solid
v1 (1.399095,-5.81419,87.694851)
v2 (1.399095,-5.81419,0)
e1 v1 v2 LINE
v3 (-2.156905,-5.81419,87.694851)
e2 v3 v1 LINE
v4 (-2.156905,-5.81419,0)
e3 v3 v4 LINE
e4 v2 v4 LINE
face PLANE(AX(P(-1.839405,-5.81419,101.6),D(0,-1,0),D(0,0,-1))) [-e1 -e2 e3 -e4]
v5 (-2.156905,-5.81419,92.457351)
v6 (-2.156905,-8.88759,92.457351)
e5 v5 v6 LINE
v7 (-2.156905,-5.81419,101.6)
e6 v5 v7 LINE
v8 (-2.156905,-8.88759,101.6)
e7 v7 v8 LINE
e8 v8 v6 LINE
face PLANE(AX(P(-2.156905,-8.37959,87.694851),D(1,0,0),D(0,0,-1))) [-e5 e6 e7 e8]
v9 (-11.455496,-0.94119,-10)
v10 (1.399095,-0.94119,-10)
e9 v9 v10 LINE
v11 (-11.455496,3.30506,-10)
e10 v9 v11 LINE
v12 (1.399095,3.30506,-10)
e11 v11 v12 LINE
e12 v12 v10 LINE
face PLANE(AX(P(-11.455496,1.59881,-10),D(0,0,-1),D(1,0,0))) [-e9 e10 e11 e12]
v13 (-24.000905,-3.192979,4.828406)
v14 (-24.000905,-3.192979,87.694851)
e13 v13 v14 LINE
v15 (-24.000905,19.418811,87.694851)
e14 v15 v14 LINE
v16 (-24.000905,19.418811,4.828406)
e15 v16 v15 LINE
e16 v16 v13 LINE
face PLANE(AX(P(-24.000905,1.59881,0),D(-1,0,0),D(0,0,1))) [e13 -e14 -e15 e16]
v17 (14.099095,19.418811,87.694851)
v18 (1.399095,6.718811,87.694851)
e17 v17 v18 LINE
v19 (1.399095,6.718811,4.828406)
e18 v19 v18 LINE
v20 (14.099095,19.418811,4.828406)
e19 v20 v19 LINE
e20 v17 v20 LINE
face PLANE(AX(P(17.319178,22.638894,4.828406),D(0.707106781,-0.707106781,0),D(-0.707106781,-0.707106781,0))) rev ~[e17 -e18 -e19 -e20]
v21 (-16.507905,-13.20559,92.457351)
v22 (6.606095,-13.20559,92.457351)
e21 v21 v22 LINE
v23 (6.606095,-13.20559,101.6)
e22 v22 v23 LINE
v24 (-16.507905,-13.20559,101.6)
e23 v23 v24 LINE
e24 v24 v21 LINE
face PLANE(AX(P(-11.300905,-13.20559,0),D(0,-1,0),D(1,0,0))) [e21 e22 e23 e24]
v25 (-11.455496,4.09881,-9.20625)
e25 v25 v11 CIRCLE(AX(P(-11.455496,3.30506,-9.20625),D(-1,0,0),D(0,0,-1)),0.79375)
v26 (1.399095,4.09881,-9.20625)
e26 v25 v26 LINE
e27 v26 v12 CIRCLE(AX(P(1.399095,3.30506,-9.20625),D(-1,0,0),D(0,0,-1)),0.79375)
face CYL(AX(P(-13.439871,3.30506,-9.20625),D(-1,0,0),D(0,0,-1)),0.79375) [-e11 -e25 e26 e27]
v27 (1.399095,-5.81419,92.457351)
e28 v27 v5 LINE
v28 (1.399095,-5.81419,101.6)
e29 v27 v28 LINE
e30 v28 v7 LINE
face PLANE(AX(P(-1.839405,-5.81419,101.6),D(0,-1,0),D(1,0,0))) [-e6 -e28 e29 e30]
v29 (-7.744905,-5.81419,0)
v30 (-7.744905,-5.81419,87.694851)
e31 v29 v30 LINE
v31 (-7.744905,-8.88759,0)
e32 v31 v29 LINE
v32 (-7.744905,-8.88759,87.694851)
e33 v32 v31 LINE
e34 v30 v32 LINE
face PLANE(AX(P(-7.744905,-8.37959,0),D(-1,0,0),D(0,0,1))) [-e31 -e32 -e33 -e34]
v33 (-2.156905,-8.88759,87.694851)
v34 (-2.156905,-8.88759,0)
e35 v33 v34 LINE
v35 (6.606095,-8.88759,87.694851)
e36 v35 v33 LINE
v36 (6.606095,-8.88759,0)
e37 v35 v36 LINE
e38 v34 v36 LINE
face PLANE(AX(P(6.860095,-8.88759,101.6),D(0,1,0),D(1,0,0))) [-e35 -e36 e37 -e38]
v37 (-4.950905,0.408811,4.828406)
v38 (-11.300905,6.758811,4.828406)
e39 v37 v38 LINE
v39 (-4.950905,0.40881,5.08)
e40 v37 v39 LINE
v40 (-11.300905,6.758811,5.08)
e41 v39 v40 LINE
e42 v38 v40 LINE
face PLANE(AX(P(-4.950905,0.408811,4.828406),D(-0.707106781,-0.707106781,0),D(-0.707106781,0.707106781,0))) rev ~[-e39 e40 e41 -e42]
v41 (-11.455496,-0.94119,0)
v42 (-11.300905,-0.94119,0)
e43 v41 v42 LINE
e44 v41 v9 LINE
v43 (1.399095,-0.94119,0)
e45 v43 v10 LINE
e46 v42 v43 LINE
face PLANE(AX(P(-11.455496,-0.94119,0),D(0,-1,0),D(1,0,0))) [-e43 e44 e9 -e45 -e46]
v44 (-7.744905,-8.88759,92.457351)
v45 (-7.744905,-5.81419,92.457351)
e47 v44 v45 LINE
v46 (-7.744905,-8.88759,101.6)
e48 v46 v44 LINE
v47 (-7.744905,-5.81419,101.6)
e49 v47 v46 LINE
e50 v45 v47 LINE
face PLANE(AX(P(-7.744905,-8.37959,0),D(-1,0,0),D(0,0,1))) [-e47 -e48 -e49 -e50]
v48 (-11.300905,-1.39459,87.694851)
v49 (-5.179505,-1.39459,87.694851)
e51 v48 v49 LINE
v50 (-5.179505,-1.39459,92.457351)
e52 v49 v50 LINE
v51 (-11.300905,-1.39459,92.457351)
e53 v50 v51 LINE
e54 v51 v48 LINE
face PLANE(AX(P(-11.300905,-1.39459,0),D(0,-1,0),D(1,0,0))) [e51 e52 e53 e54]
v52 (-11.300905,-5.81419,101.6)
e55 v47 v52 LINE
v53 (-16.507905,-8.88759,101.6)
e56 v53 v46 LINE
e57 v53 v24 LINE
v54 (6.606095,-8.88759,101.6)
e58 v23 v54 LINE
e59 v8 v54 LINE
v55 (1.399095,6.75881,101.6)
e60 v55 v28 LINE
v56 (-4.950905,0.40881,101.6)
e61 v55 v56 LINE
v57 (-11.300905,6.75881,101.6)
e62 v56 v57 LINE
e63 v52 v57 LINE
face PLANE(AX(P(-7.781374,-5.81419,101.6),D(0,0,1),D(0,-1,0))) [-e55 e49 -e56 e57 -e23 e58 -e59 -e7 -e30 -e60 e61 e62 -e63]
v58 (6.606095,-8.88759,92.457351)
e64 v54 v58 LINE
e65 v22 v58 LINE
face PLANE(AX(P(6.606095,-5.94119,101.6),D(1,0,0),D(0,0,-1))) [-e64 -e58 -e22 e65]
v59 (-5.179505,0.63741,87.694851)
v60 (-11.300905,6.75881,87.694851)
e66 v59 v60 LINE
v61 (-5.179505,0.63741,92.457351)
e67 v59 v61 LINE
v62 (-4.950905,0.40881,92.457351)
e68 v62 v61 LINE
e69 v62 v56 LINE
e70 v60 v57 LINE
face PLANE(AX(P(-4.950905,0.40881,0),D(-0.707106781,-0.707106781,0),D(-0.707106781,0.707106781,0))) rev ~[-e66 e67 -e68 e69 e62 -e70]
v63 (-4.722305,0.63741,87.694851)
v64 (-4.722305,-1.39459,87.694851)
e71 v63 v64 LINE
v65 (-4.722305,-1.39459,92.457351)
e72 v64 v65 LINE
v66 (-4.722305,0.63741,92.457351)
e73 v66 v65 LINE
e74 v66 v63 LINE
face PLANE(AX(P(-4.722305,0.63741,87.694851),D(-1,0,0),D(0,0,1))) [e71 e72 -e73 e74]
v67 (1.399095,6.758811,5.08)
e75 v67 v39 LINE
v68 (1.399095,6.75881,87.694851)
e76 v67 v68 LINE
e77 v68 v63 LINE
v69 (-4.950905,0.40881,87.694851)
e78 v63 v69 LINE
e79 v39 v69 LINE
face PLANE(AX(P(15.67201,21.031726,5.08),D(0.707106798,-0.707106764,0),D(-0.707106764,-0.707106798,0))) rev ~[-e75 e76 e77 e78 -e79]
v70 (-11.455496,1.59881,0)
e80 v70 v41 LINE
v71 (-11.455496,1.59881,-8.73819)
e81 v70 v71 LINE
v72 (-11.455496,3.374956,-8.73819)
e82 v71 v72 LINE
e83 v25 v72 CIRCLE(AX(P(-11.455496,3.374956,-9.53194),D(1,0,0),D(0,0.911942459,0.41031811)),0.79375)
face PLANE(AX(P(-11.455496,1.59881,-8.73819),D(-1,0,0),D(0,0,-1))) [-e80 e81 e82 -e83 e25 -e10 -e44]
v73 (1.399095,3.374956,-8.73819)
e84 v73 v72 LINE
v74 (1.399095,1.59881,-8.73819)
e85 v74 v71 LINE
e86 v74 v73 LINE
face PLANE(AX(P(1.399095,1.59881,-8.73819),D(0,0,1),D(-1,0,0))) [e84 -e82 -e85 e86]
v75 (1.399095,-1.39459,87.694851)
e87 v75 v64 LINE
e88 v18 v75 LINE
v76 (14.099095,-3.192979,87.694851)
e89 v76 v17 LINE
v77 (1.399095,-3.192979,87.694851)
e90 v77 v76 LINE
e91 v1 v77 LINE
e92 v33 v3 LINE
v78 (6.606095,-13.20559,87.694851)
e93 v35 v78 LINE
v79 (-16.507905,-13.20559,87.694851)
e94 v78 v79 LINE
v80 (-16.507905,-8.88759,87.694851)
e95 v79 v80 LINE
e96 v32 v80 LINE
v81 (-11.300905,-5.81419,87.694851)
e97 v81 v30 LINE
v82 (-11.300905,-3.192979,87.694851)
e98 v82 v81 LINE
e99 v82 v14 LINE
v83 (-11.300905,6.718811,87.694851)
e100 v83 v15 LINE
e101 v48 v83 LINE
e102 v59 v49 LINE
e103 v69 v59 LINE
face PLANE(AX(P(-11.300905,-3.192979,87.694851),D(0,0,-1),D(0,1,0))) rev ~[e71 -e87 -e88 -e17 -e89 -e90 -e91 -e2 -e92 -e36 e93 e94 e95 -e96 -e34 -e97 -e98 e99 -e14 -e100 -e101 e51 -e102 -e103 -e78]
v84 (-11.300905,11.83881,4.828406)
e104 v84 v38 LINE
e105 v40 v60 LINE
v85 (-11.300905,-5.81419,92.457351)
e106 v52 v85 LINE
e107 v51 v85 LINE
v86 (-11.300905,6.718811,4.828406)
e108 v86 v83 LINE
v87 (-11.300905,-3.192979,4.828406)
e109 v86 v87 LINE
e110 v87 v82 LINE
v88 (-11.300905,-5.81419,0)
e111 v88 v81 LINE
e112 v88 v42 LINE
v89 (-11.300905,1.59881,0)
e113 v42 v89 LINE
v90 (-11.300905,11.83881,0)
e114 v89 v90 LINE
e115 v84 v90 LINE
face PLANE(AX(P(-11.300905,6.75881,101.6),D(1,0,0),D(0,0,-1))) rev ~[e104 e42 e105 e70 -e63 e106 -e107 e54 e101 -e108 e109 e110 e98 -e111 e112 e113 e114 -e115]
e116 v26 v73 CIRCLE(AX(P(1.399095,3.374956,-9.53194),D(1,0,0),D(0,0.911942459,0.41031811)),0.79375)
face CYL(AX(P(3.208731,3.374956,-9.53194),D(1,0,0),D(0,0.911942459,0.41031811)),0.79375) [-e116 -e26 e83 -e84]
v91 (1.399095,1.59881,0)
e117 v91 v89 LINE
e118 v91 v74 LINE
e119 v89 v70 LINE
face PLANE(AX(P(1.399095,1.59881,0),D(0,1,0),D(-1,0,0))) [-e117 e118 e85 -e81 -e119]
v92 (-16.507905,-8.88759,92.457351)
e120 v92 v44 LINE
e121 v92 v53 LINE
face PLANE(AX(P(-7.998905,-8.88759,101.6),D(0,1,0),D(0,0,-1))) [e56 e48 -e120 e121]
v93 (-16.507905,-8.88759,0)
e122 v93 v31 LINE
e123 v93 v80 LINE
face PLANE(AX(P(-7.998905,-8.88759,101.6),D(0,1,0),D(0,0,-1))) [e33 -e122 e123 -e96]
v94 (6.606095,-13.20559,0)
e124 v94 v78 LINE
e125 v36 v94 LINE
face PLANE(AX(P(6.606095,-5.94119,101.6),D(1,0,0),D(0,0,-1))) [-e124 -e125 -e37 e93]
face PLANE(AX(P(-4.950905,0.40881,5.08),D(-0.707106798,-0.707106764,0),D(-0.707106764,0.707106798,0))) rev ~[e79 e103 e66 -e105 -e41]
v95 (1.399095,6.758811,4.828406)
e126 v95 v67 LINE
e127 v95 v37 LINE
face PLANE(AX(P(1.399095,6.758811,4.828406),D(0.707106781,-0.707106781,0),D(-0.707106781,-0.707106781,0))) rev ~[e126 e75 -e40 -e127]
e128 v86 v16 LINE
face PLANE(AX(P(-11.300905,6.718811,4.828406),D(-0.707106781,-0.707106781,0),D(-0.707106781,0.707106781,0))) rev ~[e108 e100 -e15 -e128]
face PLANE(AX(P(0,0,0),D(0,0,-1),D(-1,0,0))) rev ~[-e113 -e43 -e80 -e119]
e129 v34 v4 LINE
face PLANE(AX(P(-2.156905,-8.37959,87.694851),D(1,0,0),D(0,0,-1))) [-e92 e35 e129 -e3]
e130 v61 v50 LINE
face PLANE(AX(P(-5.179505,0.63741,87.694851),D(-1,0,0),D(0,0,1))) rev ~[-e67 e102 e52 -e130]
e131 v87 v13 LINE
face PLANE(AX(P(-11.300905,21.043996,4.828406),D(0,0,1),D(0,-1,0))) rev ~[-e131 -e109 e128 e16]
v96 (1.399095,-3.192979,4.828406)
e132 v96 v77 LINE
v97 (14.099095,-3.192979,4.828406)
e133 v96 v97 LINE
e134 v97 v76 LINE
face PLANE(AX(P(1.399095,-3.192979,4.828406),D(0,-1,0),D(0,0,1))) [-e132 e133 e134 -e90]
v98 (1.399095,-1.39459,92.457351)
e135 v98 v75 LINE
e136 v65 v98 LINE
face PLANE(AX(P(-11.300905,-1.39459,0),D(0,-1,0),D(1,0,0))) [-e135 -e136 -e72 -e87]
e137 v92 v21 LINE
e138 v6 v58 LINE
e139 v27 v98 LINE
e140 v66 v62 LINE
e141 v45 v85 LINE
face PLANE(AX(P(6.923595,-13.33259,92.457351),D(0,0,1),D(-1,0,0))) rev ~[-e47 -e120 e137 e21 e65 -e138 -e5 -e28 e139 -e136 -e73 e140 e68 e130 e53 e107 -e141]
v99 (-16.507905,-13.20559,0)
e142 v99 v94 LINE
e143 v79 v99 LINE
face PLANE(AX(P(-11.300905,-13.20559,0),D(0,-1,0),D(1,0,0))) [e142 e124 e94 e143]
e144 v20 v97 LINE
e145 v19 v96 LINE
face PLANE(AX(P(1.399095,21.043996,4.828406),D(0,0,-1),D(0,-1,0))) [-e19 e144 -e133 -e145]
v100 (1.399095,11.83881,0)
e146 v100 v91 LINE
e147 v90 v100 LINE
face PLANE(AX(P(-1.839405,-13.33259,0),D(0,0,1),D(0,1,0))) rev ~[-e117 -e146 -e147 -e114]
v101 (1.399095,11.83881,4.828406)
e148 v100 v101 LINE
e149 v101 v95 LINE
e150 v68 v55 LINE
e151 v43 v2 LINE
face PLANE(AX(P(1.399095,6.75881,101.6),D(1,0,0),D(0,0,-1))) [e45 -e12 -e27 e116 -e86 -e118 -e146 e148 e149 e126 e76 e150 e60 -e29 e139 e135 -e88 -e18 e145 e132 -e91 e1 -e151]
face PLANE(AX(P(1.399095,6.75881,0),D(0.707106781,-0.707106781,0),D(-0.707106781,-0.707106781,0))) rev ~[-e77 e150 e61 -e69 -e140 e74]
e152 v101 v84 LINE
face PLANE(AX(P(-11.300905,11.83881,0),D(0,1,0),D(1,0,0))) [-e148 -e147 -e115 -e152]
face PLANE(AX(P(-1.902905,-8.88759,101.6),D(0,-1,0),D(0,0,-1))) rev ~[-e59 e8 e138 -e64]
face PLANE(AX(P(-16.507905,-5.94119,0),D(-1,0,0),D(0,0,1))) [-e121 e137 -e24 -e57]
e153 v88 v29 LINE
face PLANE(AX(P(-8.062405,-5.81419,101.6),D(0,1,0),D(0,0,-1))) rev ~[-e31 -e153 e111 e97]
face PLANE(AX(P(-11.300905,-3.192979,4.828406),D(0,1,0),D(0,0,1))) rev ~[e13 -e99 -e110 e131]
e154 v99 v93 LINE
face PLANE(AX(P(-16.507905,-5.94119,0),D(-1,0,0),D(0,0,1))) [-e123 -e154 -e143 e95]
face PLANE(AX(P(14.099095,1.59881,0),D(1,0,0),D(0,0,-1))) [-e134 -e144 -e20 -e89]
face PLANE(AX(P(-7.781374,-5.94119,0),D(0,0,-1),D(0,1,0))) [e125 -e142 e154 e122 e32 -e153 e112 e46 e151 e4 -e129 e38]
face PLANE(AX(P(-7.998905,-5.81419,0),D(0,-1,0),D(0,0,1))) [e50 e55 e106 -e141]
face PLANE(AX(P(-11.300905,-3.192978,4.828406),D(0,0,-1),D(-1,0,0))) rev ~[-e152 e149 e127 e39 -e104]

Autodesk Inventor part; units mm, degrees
ref_plane "YZ Plane" through (0, 0, 0) normal (1, 0, 0) x (0, 1, 0)
ref_plane "XZ Plane" through (0, 0, 0) normal (0, 1, 0) x (-1, 0, 0)
ref_plane "XY Plane" through (0, 0, 0) normal (0, 0, 1) x (1, 0, 0)
sketch "Sketch1" plane through (0, 0, 0) normal (0, 0, 1) x (1, 0, 0)
  line L0 (-11.300905, 6.75881) -> (1.399095, 6.75881)
  line L1 (1.399095, 6.75881) -> (1.399095, -5.94119)
  line L2 (1.399095, -5.94119) -> (-11.300905, -5.94119)
  line L3 (-11.300905, -5.94119) -> (-11.300905, 6.75881)
  line L4 (-11.300905, 6.75881) -> (-1.742504, 6.75881) construction
  line L5 (-11.300905, 6.75881) -> (-4.950905, 0.40881)
  line L6 (1.399095, 6.75881) -> (-4.950905, 0.40881)
  point P0 (0, 0)
  dimension "d0" = 12.7
  dimension "d1" = 12.7
sketch "Sketch1 outline for Extrusion1" plane through (0, 0, 0) normal (0, 0, 1) x (1, 0, 0)
  line L0 (-4.950905, 0.40881) -> (-11.300905, 6.75881)
  line L1 (1.399095, 6.75881) -> (-4.950905, 0.40881)
  line L2 (1.399095, -5.94119) -> (1.399095, 6.75881)
  line L3 (-11.300905, -5.94119) -> (1.399095, -5.94119)
  line L4 (-11.300905, 6.75881) -> (-11.300905, -5.94119)
extrude "Extrusion1" add sketch "Sketch1 outline for Extrusion1" along normal blind 101.6
sketch "Sketch1 outline for Extrusion2" plane through (0, 0, 0) normal (0, 0, 1) x (1, 0, 0)
  line L0 (1.399095, 6.75881) -> (-11.300905, 6.75881)
  line L1 (-4.950905, 0.40881) -> (1.399095, 6.75881)
  line L2 (-11.300905, 6.75881) -> (-4.950905, 0.40881)
extrude "Extrusion2" add sketch "Sketch1 outline for Extrusion2" along normal blind 5.08
sketch "Sketch2" plane through (-11.300905, 6.75881, 0) normal (0, 1, 0) x (1, 0, 0)
  line L0 (0, 0) -> (0, -101.6)
  line L1 (12.7, 0) -> (12.7, -101.6)
  line L2 (0, 0) -> (12.7, 0)
  line L3 (12.7, 0) -> (12.7, -5.078457)
  line L4 (12.7, -5.078457) -> (0, -5.078457)
  line L5 (0, -5.078457) -> (0, 0)
  point P0 (11.300905, 0)
sketch "Sketch2 outline for Extrusion3" plane through (-11.300905, 6.75881, 0) normal (0, 1, 0) x (1, 0, 0)
  line L0 (0, 0) -> (12.7, 0)
  line L1 (12.7, 0) -> (12.7, -5.078457)
  line L2 (12.7, -5.078457) -> (0, -5.078457)
  line L3 (0, -5.078457) -> (0, 0)
extrude "Extrusion3" add sketch "Sketch2 outline for Extrusion3" along normal blind 5.08
sketch "Sketch3" plane through (-11.300905, -5.94119, 0) normal (0, -1, 0) x (1, 0, 0)
  line L0 (12.7, 101.6) -> (6.35, 101.6) projected
  line L1 (0, 0) -> (12.7, 0) projected
  line L2 (9.4615, 101.6) -> (3.2385, 101.6)
  line L3 (3.2385, 101.6) -> (3.2385, 0)
  line L4 (3.2385, 0) -> (9.4615, 0)
  line L5 (9.4615, 0) -> (9.4615, 101.6)
  line L6 (6.35, 5.08) -> (6.35, 101.6) construction
  point P0 (11.300905, 0)
  dimension "d9" = 6.223
sketch "Sketch3 outline for Extrusion4" plane through (-11.300905, -5.94119, 0) normal (0, -1, 0) x (1, 0, 0)
  line L0 (9.4615, 0) -> (9.4615, 101.6)
  line L1 (3.2385, 0) -> (9.4615, 0)
  line L2 (3.2385, 101.6) -> (3.2385, 0)
  line L3 (9.4615, 101.6) -> (3.2385, 101.6)
extrude "Extrusion4" add sketch "Sketch3 outline for Extrusion4" along normal blind 7.3914
sketch "Sketch4" plane through (-1.839405, -5.94119, 101.6) normal (1, 0, 0) x (0, 0, -1)
  line L0 (101.6, -7.3914) -> (0, -7.3914) projected
  line L1 (101.6, 0) -> (101.6, -7.3914) projected
  line L2 (0, -7.3914) -> (101.6, -7.3914)
  line L3 (101.6, -7.3914) -> (101.6, -2.4384)
  line L4 (101.6, -2.4384) -> (0, -2.4384)
  line L5 (0, -2.4384) -> (0, -7.3914)
  point P0 (101.6, 5.94119)
  dimension "d12" = 4.953
sketch "Sketch5" plane through (-8.062405, -5.94119, 0) normal (-1, 0, 0) x (0, 0, 1)
  line L0 (0, -7.3914) -> (101.6, -7.3914) projected
  line L1 (0, 0) -> (0, -7.3914) projected
  line L2 (101.6, -7.3914) -> (0, -7.3914)
  line L3 (0, -7.3914) -> (0, -2.4384)
  line L4 (0, -2.4384) -> (101.6, -2.4384)
  line L5 (101.6, -2.4384) -> (101.6, -7.3914)
  point P0 (0, 5.94119)
  dimension "d13" = 4.953
sketch "Sketch5 outline for Extrusion5" plane through (-8.062405, -5.94119, 0) normal (-1, 0, 0) x (0, 0, 1)
  line L0 (0, -7.3914) -> (101.6, -7.3914)
  line L1 (0, -2.4384) -> (0, -7.3914)
  line L2 (101.6, -2.4384) -> (0, -2.4384)
  line L3 (101.6, -7.3914) -> (101.6, -2.4384)
extrude "Extrusion5" add sketch "Sketch5 outline for Extrusion5" along normal blind 8.763
sketch "Sketch4 outline for Extrusion6" plane through (-1.839405, -5.94119, 101.6) normal (1, 0, 0) x (0, 0, -1)
  line L0 (101.6, -7.3914) -> (101.6, -2.4384)
  line L1 (0, -7.3914) -> (101.6, -7.3914)
  line L2 (0, -2.4384) -> (0, -7.3914)
  line L3 (101.6, -2.4384) -> (0, -2.4384)
extrude "Extrusion6" add sketch "Sketch4 outline for Extrusion6" along normal blind 8.763
sketch "Sketch6" plane through (0, 0, 0) normal (0, 0, -1) x (-1, 0, 0)
  line L0 (-1.399095, -5.94119) -> (-1.399095, 6.75881)
  line L1 (-1.399095, 1.59881) -> (11.455496, 1.59881)
  line L2 (11.455496, 1.59881) -> (11.455496, -0.94119)
  line L3 (11.455496, -0.94119) -> (-1.399095, -0.94119)
  line L4 (-1.399095, -0.94119) -> (-1.399095, 1.59881)
  line L5 (11.300905, -5.94119) -> (8.062405, -5.94119)
  point P0 (0, 0)
  dimension "d18" = 2.54
  dimension "d19" = 5
sketch "Sketch6 outline for Extrusion7" plane through (0, 0, 0) normal (0, 0, -1) x (-1, 0, 0)
  line L0 (-1.399095, 1.59881) -> (11.455496, 1.59881)
  line L1 (11.455496, 1.59881) -> (11.455496, -0.94119)
  line L2 (11.455496, -0.94119) -> (-1.399095, -0.94119)
  line L3 (-1.399095, -0.94119) -> (-1.399095, 1.59881)
extrude "Extrusion7" add sketch "Sketch6 outline for Extrusion7" along normal blind 10
sketch "Sketch7" plane through (-11.300905, 1.59881, 0) normal (0, 1, 0) x (1, 0, 0)
  line L0 (-0.154591, 0) -> (-0.154591, 10)
  line L1 (12.7, 0) -> (12.7, 10)
  line L2 (-0.154591, 10) -> (12.7, 10)
  line L3 (12.7, 10) -> (12.7, 8.73819)
  line L4 (12.7, 8.73819) -> (-0.154591, 8.73819)
  line L5 (-0.154591, 8.73819) -> (-0.154591, 10)
  point P0 (11.300905, 0)
sketch "Sketch7 outline for Extrusion8" plane through (-11.300905, 1.59881, 0) normal (0, 1, 0) x (1, 0, 0)
  line L0 (-0.154591, 10) -> (12.7, 10)
  line L1 (12.7, 10) -> (12.7, 8.73819)
  line L2 (12.7, 8.73819) -> (-0.154591, 8.73819)
  line L3 (-0.154591, 8.73819) -> (-0.154591, 10)
extrude "Extrusion8" add sketch "Sketch7 outline for Extrusion8" along normal blind 2.5
fillet "Fillet1" radius 0.79375 2 edges at (-5.0282, 4.0988, -10) (-5.0282, 4.0988, -8.7382)
sketch "Sketch8" plane through (-11.300905, -13.33259, 0) normal (0, -1, 0) x (1, 0, 0)
  line L0 (18.2245, 101.6) -> (18.2245, 0)
  line L1 (-5.5245, 0) -> (-5.5245, 101.6)
  line L2 (18.2245, 92.457351) -> (-5.5245, 92.457351)
  line L3 (-5.5245, 92.457351) -> (-5.5245, 87.694851)
  line L4 (-5.5245, 87.694851) -> (18.2245, 87.694851)
  line L5 (18.2245, 87.694851) -> (18.2245, 92.457351)
  point P0 (11.300905, 0)
  dimension "d25" = 4.7625
sketch "Sketch8 outline for Extrusion9" plane through (-11.300905, -13.33259, 0) normal (0, -1, 0) x (1, 0, 0)
  line L0 (18.2245, 87.694851) -> (18.2245, 92.457351)
  line L1 (-5.5245, 87.694851) -> (18.2245, 87.694851)
  line L2 (-5.5245, 92.457351) -> (-5.5245, 87.694851)
  line L3 (18.2245, 92.457351) -> (-5.5245, 92.457351)
extrude "Extrusion9" cut sketch "Sketch8 outline for Extrusion9" against normal blind 13.97
sketch "Sketch9" plane through (-11.300905, -13.33259, 0) normal (0, -1, 0) x (1, 0, 0)
  line L0 (-5.5245, 101.6) -> (18.2245, 101.6) projected
  line L1 (3.2385, 0) -> (-5.5245, 0) projected
  line L2 (18.2245, 101.6) -> (-5.5245, 101.6)
  line L3 (-5.5245, 101.6) -> (-5.5245, 0)
  line L4 (-5.5245, 0) -> (18.2245, 0)
  line L5 (18.2245, 0) -> (18.2245, 101.6)
  point P0 (11.300905, 0)
sketch "Sketch9 outline for Extrusion10" plane through (-11.300905, -13.33259, 0) normal (0, -1, 0) x (1, 0, 0)
  line L0 (18.2245, 0) -> (18.2245, 101.6)
  line L1 (-5.5245, 0) -> (18.2245, 0)
  line L2 (-5.5245, 101.6) -> (-5.5245, 0)
  line L3 (18.2245, 101.6) -> (-5.5245, 101.6)
extrude "Extrusion10" cut sketch "Sketch9 outline for Extrusion10" against normal blind 0.127
sketch "Sketch10" plane through (-1.839405, -5.94119, 101.6) normal (0, -1, 0) x (1, 0, 0)
  line L0 (3.2385, -9.142649) -> (3.2385, 0)
  line L1 (0, -13.905149) -> (0, -101.6)
  line L2 (3.2385, 0) -> (0, 0)
  line L3 (0, 0) -> (0, -101.6)
  line L4 (0, -101.6) -> (3.2385, -101.6)
  line L5 (3.2385, -101.6) -> (3.2385, 0)
  line L6 (-9.4615, -9.142649) -> (-9.4615, 0)
  line L7 (-9.4615, -101.6) -> (3.2385, -101.6)
  line L8 (-9.4615, 0) -> (-5.941969, 0)
  line L9 (-5.941969, 0) -> (-5.941969, -101.6)
  line L10 (-5.941969, -101.6) -> (-9.4615, -101.6)
  line L11 (-9.4615, -101.6) -> (-9.4615, 0)
  point P0 (1.839405, -101.6)
sketch "Sketch10 outline for Extrusion11" plane through (-1.839405, -5.94119, 101.6) normal (0, -1, 0) x (1, 0, 0)
  line L0 (3.2385, -101.6) -> (3.2385, 0)
  line L1 (0, -101.6) -> (3.2385, -101.6)
  line L2 (0, 0) -> (0, -101.6)
  line L3 (3.2385, 0) -> (0, 0)
  line L4 (-9.4615, -101.6) -> (-5.941969, -101.6)
  line L5 (-9.4615, 0) -> (-9.4615, -101.6)
  line L6 (-5.941969, 0) -> (-9.4615, 0)
  line L7 (-5.941969, -101.6) -> (-5.941969, 0)
extrude "Extrusion11" cut sketch "Sketch10 outline for Extrusion11" against normal blind 0.127
sketch "Sketch11" plane through (6.923595, -5.94119, 101.6) normal (1, 0, 0) x (0, 0, -1)
  line L0 (0, -2.4384) -> (9.142649, -2.4384)
  line L1 (0, -2.4384) -> (101.6, -2.4384)
  line L2 (101.6, -2.4384) -> (101.6, -7.2644)
  line L3 (101.6, -7.2644) -> (0, -7.2644)
  line L4 (0, -7.2644) -> (0, -2.4384)
  point P0 (101.6, 5.94119)
sketch "Sketch11 outline for Extrusion12" plane through (6.923595, -5.94119, 101.6) normal (1, 0, 0) x (0, 0, -1)
  line L0 (0, -2.4384) -> (101.6, -2.4384)
  line L1 (101.6, -2.4384) -> (101.6, -7.2644)
  line L2 (101.6, -7.2644) -> (0, -7.2644)
  line L3 (0, -7.2644) -> (0, -2.4384)
extrude "Extrusion12" cut sketch "Sketch11 outline for Extrusion12" against normal blind 0.0635
sketch "Sketch12" plane through (-16.825405, -5.94119, 0) normal (-1, 0, 0) x (0, 0, 1)
  line L0 (101.6, -7.2644) -> (101.6, -2.4384) projected
  line L1 (0, 0) -> (0, -2.4384) projected
  line L2 (101.6, -7.2644) -> (0, -7.2644)
  line L3 (0, -7.2644) -> (0, -2.4384)
  line L4 (0, -2.4384) -> (101.6, -2.4384)
  line L5 (101.6, -2.4384) -> (101.6, -7.2644)
  point P0 (0, 5.94119)
sketch "Sketch12 outline for Extrusion13" plane through (-16.825405, -5.94119, 0) normal (-1, 0, 0) x (0, 0, 1)
  line L0 (101.6, -7.2644) -> (0, -7.2644)
  line L1 (0, -7.2644) -> (0, -2.4384)
  line L2 (0, -2.4384) -> (101.6, -2.4384)
  line L3 (101.6, -2.4384) -> (101.6, -7.2644)
extrude "Extrusion13" cut sketch "Sketch12 outline for Extrusion13" against normal blind 0.0635
sketch "Sketch13" plane through (-7.781374, -5.94119, 92.457351) normal (-1, 0, 0) x (0, 0, 1)
  line L0 (-92.457351, 0.127) -> (-4.7625, 0.127)
  line L1 (9.142649, -2.4384) -> (9.142649, 0.127)
  line L2 (-92.457351, 0.127) -> (9.142649, 0.127)
  line L3 (9.142649, 0.127) -> (9.142649, 0.002557)
  line L4 (9.142649, 0.002557) -> (-92.457351, 0.002557)
  line L5 (-92.457351, 0.002557) -> (-92.457351, 0.127)
  point P0 (-92.457351, 5.94119)
sketch "Sketch14" plane through (-7.781374, -5.94119, 0) normal (-1, 0, 0) x (0, 0, 1)
  line L0 (0, 0.127) -> (87.694851, 0.127)
  line L1 (92.457351, 0) -> (101.6, 0)
  line L2 (0, 0.127) -> (101.6, 0.127)
  line L3 (101.6, 0.127) -> (101.6, 0)
  line L4 (101.6, 0) -> (0, 0)
  line L5 (0, 0) -> (0, 0.127)
  point P0 (0, 5.94119)
sketch "Sketch14 outline for Extrusion14" plane through (-7.781374, -5.94119, 0) normal (-1, 0, 0) x (0, 0, 1)
  line L0 (0, 0.127) -> (101.6, 0.127)
  line L1 (101.6, 0.127) -> (101.6, 0)
  line L2 (101.6, 0) -> (0, 0)
  line L3 (0, 0) -> (0, 0.127)
extrude "Extrusion14" add sketch "Sketch14 outline for Extrusion14" along normal blind 0.28194
sketch "Sketch15" plane through (-1.839405, -8.37959, 87.694851) normal (1, 0, 0) x (0, 0, -1)
  line L0 (-4.7625, 2.5654) -> (-13.905149, 2.5654)
  line L1 (87.694851, 2.4384) -> (87.694851, 0)
  line L2 (-13.905149, 2.5654) -> (87.694851, 2.5654)
  line L3 (87.694851, 2.5654) -> (87.694851, 0)
  line L4 (87.694851, 0) -> (-13.905149, 0)
  line L5 (-13.905149, 0) -> (-13.905149, 2.5654)
  point P0 (87.694851, 8.37959)
sketch "Sketch15 outline for Extrusion15" plane through (-1.839405, -8.37959, 87.694851) normal (1, 0, 0) x (0, 0, -1)
  line L0 (-13.905149, 2.5654) -> (87.694851, 2.5654)
  line L1 (87.694851, 2.5654) -> (87.694851, 0)
  line L2 (87.694851, 0) -> (-13.905149, 0)
  line L3 (-13.905149, 0) -> (-13.905149, 2.5654)
extrude "Extrusion15" cut sketch "Sketch15 outline for Extrusion15" against normal blind 0.0635
sketch "Sketch16" plane through (-8.062405, -8.37959, 0) normal (-1, 0, 0) x (0, 0, 1)
  line L0 (101.6, 2.5654) -> (92.457351, 2.5654)
  line L1 (0, -4.826) -> (0, 0)
  line L2 (101.6, 2.5654) -> (0, 2.5654)
  line L3 (0, 2.5654) -> (0, 0)
  line L4 (0, 0) -> (101.6, 0)
  line L5 (101.6, 0) -> (101.6, 2.5654)
  point P0 (0, 8.37959)
sketch "Sketch16 outline for Extrusion16" plane through (-8.062405, -8.37959, 0) normal (-1, 0, 0) x (0, 0, 1)
  line L0 (101.6, 0) -> (101.6, 2.5654)
  line L1 (0, 0) -> (101.6, 0)
  line L2 (0, 2.5654) -> (0, 0)
  line L3 (101.6, 2.5654) -> (0, 2.5654)
extrude "Extrusion16" cut sketch "Sketch16 outline for Extrusion16" against normal blind 0.0635
sketch "Sketch17" plane through (-11.300905, 0.63741, 0) normal (0, -1, 0) x (1, 0, 0)
  point P0 (11.300905, 0)
sketch "Sketch18" plane through (6.860095, -8.37959, 101.6) normal (0, 1, 0) x (1, 0, 0)
  line L0 (0, 0) -> (0, 9.142649)
  line L1 (-8.763, 9.142649) -> (0, 9.142649)
  line L2 (0, 0) -> (-8.763, 0)
  line L3 (-8.763, 0) -> (-8.763, 9.142649)
  line L4 (-8.763, 9.142649) -> (0, 9.142649)
  line L5 (0, 9.142649) -> (0, 0)
  line L6 (-14.859, 0) -> (-23.622, 0)
  line L7 (-14.859, 9.142649) -> (-23.622, 9.142649)
  line L8 (-14.859, 0) -> (-23.622, 0)
  line L9 (-23.622, 0) -> (-23.622, 9.142649)
  line L10 (-23.622, 9.142649) -> (-14.859, 9.142649)
  line L11 (-14.859, 9.142649) -> (-14.859, 0)
  line L12 (-8.763, 13.905149) -> (0, 13.905149)
  line L13 (-5.461, 101.6) -> (-18.161, 101.6)
  line L14 (0, 13.905149) -> (-8.763, 13.905149)
  line L15 (-8.763, 13.905149) -> (-8.763, 101.6)
  line L16 (-8.763, 101.6) -> (0, 101.6)
  line L17 (0, 101.6) -> (0, 13.905149)
  line L18 (-23.622, 13.905149) -> (-14.859, 13.905149)
  line L19 (-14.923409, 101.6) -> (-14.923409, 13.905149)
  line L20 (-23.622, 13.905149) -> (-14.923409, 13.905149)
  line L21 (-14.923409, 13.905149) -> (-14.923409, 101.6)
  line L22 (-14.923409, 101.6) -> (-23.622, 101.6)
  line L23 (-23.622, 101.6) -> (-23.622, 13.905149)
  point P0 (-6.860095, 101.6)
sketch "Sketch18 outline for Extrusion17" plane through (6.860095, -8.37959, 101.6) normal (0, 1, 0) x (1, 0, 0)
  line L0 (-8.763, 0) -> (0, 0)
  line L1 (-8.763, 9.142649) -> (-8.763, 0)
  line L2 (0, 9.142649) -> (-8.763, 9.142649)
  line L3 (0, 0) -> (0, 9.142649)
  line L4 (-14.859, 0) -> (-23.622, 0)
  line L5 (-23.622, 0) -> (-23.622, 9.142649)
  line L6 (-23.622, 9.142649) -> (-14.859, 9.142649)
  line L7 (-14.859, 9.142649) -> (-14.859, 0)
  line L8 (-14.923409, 13.905149) -> (-14.923409, 101.6)
  line L9 (-23.622, 13.905149) -> (-14.923409, 13.905149)
  line L10 (-23.622, 101.6) -> (-23.622, 13.905149)
  line L11 (-14.923409, 101.6) -> (-23.622, 101.6)
  line L12 (-8.763, 13.905149) -> (0, 13.905149)
  line L13 (-8.763, 101.6) -> (-8.763, 13.905149)
  line L14 (0, 101.6) -> (-8.763, 101.6)
  line L15 (0, 13.905149) -> (0, 101.6)
extrude "Extrusion17" cut sketch "Sketch18 outline for Extrusion17" against normal blind 0.508
sketch "Sketch19" plane through (6.860095, -5.94119, 101.6) normal (1, 0, 0) x (0, 0, -1)
  line L0 (0, 0.127) -> (0, -2.9464)
  line L1 (13.905149, -7.2644) -> (101.6, -7.2644)
  line L2 (0, -2.9464) -> (101.6, -2.9464)
  line L3 (101.6, -2.9464) -> (101.6, -7.2644)
  line L4 (101.6, -7.2644) -> (0, -7.2644)
  line L5 (0, -7.2644) -> (0, -2.9464)
  point P0 (101.6, 5.94119)
sketch "Sketch19 outline for Extrusion18" plane through (6.860095, -5.94119, 101.6) normal (1, 0, 0) x (0, 0, -1)
  line L0 (0, -2.9464) -> (101.6, -2.9464)
  line L1 (101.6, -2.9464) -> (101.6, -7.2644)
  line L2 (101.6, -7.2644) -> (0, -7.2644)
  line L3 (0, -7.2644) -> (0, -2.9464)
extrude "Extrusion18" cut sketch "Sketch19 outline for Extrusion18" against normal blind 0.254
sketch "Sketch20" plane through (-16.761905, -5.94119, 0) normal (-1, 0, 0) x (0, 0, 1)
  line L0 (87.694851, -2.9464) -> (0, -2.9464)
  line L1 (101.6, -7.2644) -> (92.457351, -7.2644)
  line L2 (0, -2.9464) -> (101.6, -2.9464)
  line L3 (101.6, -2.9464) -> (101.6, -7.2644)
  line L4 (101.6, -7.2644) -> (0, -7.2644)
  line L5 (0, -7.2644) -> (0, -2.9464)
  point P0 (0, 5.94119)
sketch "Sketch20 outline for Extrusion19" plane through (-16.761905, -5.94119, 0) normal (-1, 0, 0) x (0, 0, 1)
  line L0 (0, -2.9464) -> (101.6, -2.9464)
  line L1 (101.6, -2.9464) -> (101.6, -7.2644)
  line L2 (101.6, -7.2644) -> (0, -7.2644)
  line L3 (0, -7.2644) -> (0, -2.9464)
extrude "Extrusion19" cut sketch "Sketch20 outline for Extrusion19" against normal blind 0.254
sketch "Sketch21" plane through (-11.300905, 6.75881, 5.08) normal (-1, 0, 0) x (0, 0, 1)
  line L0 (82.614851, -12.573) -> (-5.08, -12.573)
  line L1 (96.52, -12.573) -> (96.52, -15.6464)
  line L2 (-5.08, -12.573) -> (96.52, -12.573)
  line L3 (96.52, -12.573) -> (96.52, -15.6464)
  line L4 (96.52, -15.6464) -> (-5.08, -15.6464)
  line L5 (-5.08, -15.6464) -> (-5.08, -12.573)
  point P0 (-5.08, -6.75881)
sketch "Sketch21 outline for Extrusion20" plane through (-11.300905, 6.75881, 5.08) normal (-1, 0, 0) x (0, 0, 1)
  line L0 (-5.08, -12.573) -> (96.52, -12.573)
  line L1 (96.52, -12.573) -> (96.52, -15.6464)
  line L2 (96.52, -15.6464) -> (-5.08, -15.6464)
  line L3 (-5.08, -15.6464) -> (-5.08, -12.573)
extrude "Extrusion20" cut sketch "Sketch21 outline for Extrusion20" against normal blind 3.302
sketch "Sketch22" plane through (-1.902905, -8.37959, 87.694851) normal (1, 0, 0) x (0, 0, -1)
  line L0 (0, 2.5654) -> (87.694851, 2.5654)
  line L1 (-4.7625, -0.508) -> (-13.905149, -0.508)
  line L2 (87.694851, 2.5654) -> (-13.905149, 2.5654)
  line L3 (-13.905149, 2.5654) -> (-13.905149, -0.508)
  line L4 (-13.905149, -0.508) -> (87.694851, -0.508)
  line L5 (87.694851, -0.508) -> (87.694851, 2.5654)
  point P0 (87.694851, 8.37959)
sketch "Sketch22 outline for Extrusion21" plane through (-1.902905, -8.37959, 87.694851) normal (1, 0, 0) x (0, 0, -1)
  line L0 (87.694851, -0.508) -> (87.694851, 2.5654)
  line L1 (-13.905149, -0.508) -> (87.694851, -0.508)
  line L2 (-13.905149, 2.5654) -> (-13.905149, -0.508)
  line L3 (87.694851, 2.5654) -> (-13.905149, 2.5654)
extrude "Extrusion21" cut sketch "Sketch22 outline for Extrusion21" against normal blind 0.254
sketch "Sketch23" plane through (-7.998905, -8.37959, 0) normal (-1, 0, 0) x (0, 0, 1)
  line L0 (87.694851, 2.5654) -> (0, 2.5654)
  line L1 (0, 2.5654) -> (101.6, 2.5654)
  line L2 (101.6, 2.5654) -> (101.6, -0.508)
  line L3 (101.6, -0.508) -> (0, -0.508)
  line L4 (0, -0.508) -> (0, 2.5654)
  point P0 (0, 8.37959)
sketch "Sketch23 outline for Extrusion22" plane through (-7.998905, -8.37959, 0) normal (-1, 0, 0) x (0, 0, 1)
  line L0 (0, 2.5654) -> (101.6, 2.5654)
  line L1 (101.6, 2.5654) -> (101.6, -0.508)
  line L2 (101.6, -0.508) -> (0, -0.508)
  line L3 (0, -0.508) -> (0, 2.5654)
extrude "Extrusion22" cut sketch "Sketch23 outline for Extrusion22" against normal blind 0.254
sketch "Sketch24" plane through (1.399095, 6.75881, 101.6) normal (1, 0, 0) x (0, 0, -1)
  point P0 (101.6, -6.75881)
sketch "Sketch25" plane through (0, 0, 5.08) normal (0, 0, 1) x (1, 0, 0)
  line L0 (1.399095, 6.75881) -> (-4.950905, 0.40881)
  line L1 (-4.950905, 0.40881) -> (-25.57382, 21.031726)
  line L2 (-25.57382, 21.031726) -> (15.67201, 21.031726)
  line L3 (15.67201, 21.031726) -> (-4.950905, 0.40881)
  point P0 (0, 0)
sketch "Sketch26" plane through (1.399095, 6.75881, 101.6) normal (1, 0, 0) x (0, 0, -1)
  line L0 (101.6, -12.573) -> (13.905149, -12.573)
  line L1 (13.905149, -12.573) -> (96.533031, -12.573)
  line L2 (96.533031, -12.573) -> (96.533031, 14.285186)
  line L3 (96.533031, 14.285186) -> (13.905149, 14.285186)
  line L4 (13.905149, 14.285186) -> (13.905149, -12.573)
  point P0 (101.6, -6.75881)
sketch "Sketch26 outline for Extrusion23" plane through (1.399095, 6.75881, 101.6) normal (1, 0, 0) x (0, 0, -1)
  line L0 (13.905149, 14.285186) -> (13.905149, -12.573)
  line L1 (96.533031, 14.285186) -> (13.905149, 14.285186)
  line L2 (96.533031, -12.573) -> (96.533031, 14.285186)
  line L3 (13.905149, -12.573) -> (96.533031, -12.573)
extrude "Extrusion23" add sketch "Sketch26 outline for Extrusion23" against normal blind 12.7
sketch "Sketch27" plane through (1.399095, 1.59881, 0) normal (1, 0, 0) x (0, 0, -1)
  line L0 (-87.694851, 19.445186) -> (-87.694851, 5.16)
  line L1 (-87.694851, 19.445186) -> (-4.828406, 19.445186)
  line L2 (-4.828406, 19.445186) -> (-4.828406, -4.791789)
  line L3 (-4.828406, -4.791789) -> (-87.694851, -4.791789)
  line L4 (-87.694851, -4.791789) -> (-87.694851, 19.445186)
  point P0 (0, -1.59881)
sketch "Sketch27 outline for Extrusion24" plane through (1.399095, 1.59881, 0) normal (1, 0, 0) x (0, 0, -1)
  line L0 (-87.694851, 19.445186) -> (-4.828406, 19.445186)
  line L1 (-4.828406, 19.445186) -> (-4.828406, -4.791789)
  line L2 (-4.828406, -4.791789) -> (-87.694851, -4.791789)
  line L3 (-87.694851, -4.791789) -> (-87.694851, 19.445186)
extrude "Extrusion24" add sketch "Sketch27 outline for Extrusion24" along normal blind 12.7
sketch "Sketch28" plane through (-11.300905, 1.59881, 0) normal (-1, 0, 0) x (0, 0, 1)
  line L0 (87.694851, 19.445186) -> (5.066969, 19.445186)
  line L1 (4.828406, 10.24) -> (4.828406, -4.791789)
  line L2 (87.694851, 19.445186) -> (4.828406, 19.445186)
  line L3 (4.828406, 19.445186) -> (4.828406, -4.791789)
  line L4 (4.828406, -4.791789) -> (87.694851, -4.791789)
  line L5 (87.694851, -4.791789) -> (87.694851, 19.445186)
  point P0 (0, -1.59881)
sketch "Sketch28 outline for Extrusion25" plane through (-11.300905, 1.59881, 0) normal (-1, 0, 0) x (0, 0, 1)
  line L0 (87.694851, -4.791789) -> (87.694851, 19.445186)
  line L1 (4.828406, -4.791789) -> (87.694851, -4.791789)
  line L2 (4.828406, 19.445186) -> (4.828406, -4.791789)
  line L3 (87.694851, 19.445186) -> (4.828406, 19.445186)
extrude "Extrusion25" add sketch "Sketch28 outline for Extrusion25" along normal blind 12.7
sketch "Sketch25 outline for Extrusion26" plane through (0, 0, 5.08) normal (0, 0, 1) x (1, 0, 0)
  line L0 (-4.950905, 0.40881) -> (-25.57382, 21.031726)
  line L1 (-25.57382, 21.031726) -> (15.67201, 21.031726)
  line L2 (15.67201, 21.031726) -> (-4.950905, 0.40881)
extrude "Extrusion26" cut sketch "Sketch25 outline for Extrusion26" along normal blind 101.6
sketch "Sketch29" plane through (1.399095, 21.043996, 4.828406) normal (0, 1, 0) x (1, 0, 0)
  line L0 (-25.4, 0) -> (12.7, 0)
  line L1 (12.7, 0) -> (12.7, -82.866444)
  line L2 (12.7, -82.866444) -> (-25.4, -82.866444)
  line L3 (-25.4, -82.866444) -> (-25.4, 0)
  point P0 (-1.399095, 4.828406)
sketch "Sketch29 outline for Extrusion27" plane through (1.399095, 21.043996, 4.828406) normal (0, 1, 0) x (1, 0, 0)
  line L0 (-25.4, 0) -> (12.7, 0)
  line L1 (12.7, 0) -> (12.7, -82.866444)
  line L2 (12.7, -82.866444) -> (-25.4, -82.866444)
  line L3 (-25.4, -82.866444) -> (-25.4, 0)
extrude "Extrusion27" cut sketch "Sketch29 outline for Extrusion27" against normal blind 1.27
sketch "Sketch30" plane through (-11.300905, -3.192978, 4.828406) normal (0, 0, -1) x (-1, 0, 0)
  line L0 (0, 15.031789) -> (0, 4.791789)
  line L1 (0, 9.911789) -> (12.7, 22.611789)
  line L2 (12.7, 0) -> (12.7, 22.651789)
  line L3 (0, 9.911789) -> (17.960512, 9.911789) construction
  line L4 (12.7, 22.611789) -> (19.140166, 29.051955)
  line L5 (-12.7, 4.791789) -> (-12.7, 15.031789)
  line L6 (-12.7, 9.911789) -> (-28.620083, 25.831872)
  line L7 (-12.7, 9.911789) -> (9.814397, 9.911789) construction
  line L8 (-28.620083, 25.831872) -> (-31.840166, 29.051955)
  line L9 (-31.840166, 29.051955) -> (19.140166, 29.051955)
  line L10 (-25.4, 0) -> (-25.4, 22.966975)
  line L11 (-12.7, 9.951789) -> (-6.35, 3.601789)
  line L12 (-12.7, 9.911789) -> (-6.35, 3.601789)
  line L13 (-6.35, 3.601789) -> (0, 9.951789)
  line L14 (-6.35, 3.601789) -> (0, 9.951789)
  point P0 (-11.300905, 3.192978)
  dimension "d64" = 45
  dimension "d65" = 135
sketch "Sketch30 outline for Extrusion28" plane through (-11.300905, -3.192978, 4.828406) normal (0, 0, -1) x (-1, 0, 0)
  line L0 (0, 9.951789) -> (0, 9.911789)
  line L1 (-6.35, 3.601789) -> (0, 9.951789)
  line L2 (-12.7, 9.951789) -> (-6.35, 3.601789)
  line L3 (-12.7, 9.911789) -> (-12.7, 9.951789)
  line L4 (-28.620083, 25.831872) -> (-12.7, 9.911789)
  line L5 (-31.840166, 29.051955) -> (-28.620083, 25.831872)
  line L6 (19.140166, 29.051955) -> (-31.840166, 29.051955)
  line L7 (12.7, 22.611789) -> (19.140166, 29.051955)
  line L8 (0, 9.911789) -> (12.7, 22.611789)
extrude "Extrusion28" cut sketch "Sketch30 outline for Extrusion28" against normal blind 152.4
sketch "Sketch31" plane through (1.399095, 1.59881, 0) normal (1, 0, 0) x (0, 0, -1)
  line L0 (-92.457351, -0.9614) -> (-92.457351, -7.413)
  line L1 (-87.694851, -10.4864) -> (-87.694851, -7.413)
  line L2 (-92.457351, -4.418125) -> (-87.694851, -4.418125)
  line L3 (-87.694851, -4.418125) -> (-87.694851, -9.88761)
  line L4 (-87.694851, -9.88761) -> (-92.457351, -9.88761)
  line L5 (-92.457351, -9.88761) -> (-92.457351, -4.418125)
  point P0 (0, -1.59881)
sketch "Sketch31 outline for Extrusion29" plane through (1.399095, 1.59881, 0) normal (1, 0, 0) x (0, 0, -1)
  line L0 (-92.457351, -4.418125) -> (-87.694851, -4.418125)
  line L1 (-87.694851, -4.418125) -> (-87.694851, -9.88761)
  line L2 (-87.694851, -9.88761) -> (-92.457351, -9.88761)
  line L3 (-92.457351, -9.88761) -> (-92.457351, -4.418125)
extrude "Extrusion29" cut sketch "Sketch31 outline for Extrusion29" against normal blind 50.8
sketch "Sketch32" plane through (-11.300905, 0.63741, 0) normal (0, -1, 0) x (1, 0, 0)
  line L0 (12.7, 87.694851) -> (6.5786, 87.694851)
  line L1 (6.5786, 92.457351) -> (12.7, 92.457351)
  line L2 (12.7, 87.694851) -> (6.5786, 87.694851)
  line L3 (6.5786, 87.694851) -> (6.5786, 92.457351)
  line L4 (6.5786, 92.457351) -> (12.7, 92.457351)
  line L5 (12.7, 92.457351) -> (12.7, 87.694851)
  line L6 (6.1214, 87.694851) -> (0, 87.694851)
  line L7 (0, 4.828406) -> (0, 101.6)
  line L8 (6.1214, 87.694851) -> (0, 87.694851)
  line L9 (0, 87.694851) -> (0, 92.457351)
  line L10 (0, 92.457351) -> (6.1214, 92.457351)
  line L11 (6.1214, 92.457351) -> (6.1214, 87.694851)
  point P0 (11.300905, 0)
sketch "Sketch32 outline for Extrusion30" plane through (-11.300905, 0.63741, 0) normal (0, -1, 0) x (1, 0, 0)
  line L0 (12.7, 87.694851) -> (6.5786, 87.694851)
  line L1 (6.5786, 87.694851) -> (6.5786, 92.457351)
  line L2 (6.5786, 92.457351) -> (12.7, 92.457351)
  line L3 (12.7, 92.457351) -> (12.7, 87.694851)
  line L4 (0, 87.694851) -> (6.1214, 87.694851)
  line L5 (0, 92.457351) -> (0, 87.694851)
  line L6 (6.1214, 92.457351) -> (0, 92.457351)
  line L7 (6.1214, 87.694851) -> (6.1214, 92.457351)
extrude "Extrusion30" add sketch "Sketch32 outline for Extrusion30" along normal blind 2.032
properties part number "structureholder"
